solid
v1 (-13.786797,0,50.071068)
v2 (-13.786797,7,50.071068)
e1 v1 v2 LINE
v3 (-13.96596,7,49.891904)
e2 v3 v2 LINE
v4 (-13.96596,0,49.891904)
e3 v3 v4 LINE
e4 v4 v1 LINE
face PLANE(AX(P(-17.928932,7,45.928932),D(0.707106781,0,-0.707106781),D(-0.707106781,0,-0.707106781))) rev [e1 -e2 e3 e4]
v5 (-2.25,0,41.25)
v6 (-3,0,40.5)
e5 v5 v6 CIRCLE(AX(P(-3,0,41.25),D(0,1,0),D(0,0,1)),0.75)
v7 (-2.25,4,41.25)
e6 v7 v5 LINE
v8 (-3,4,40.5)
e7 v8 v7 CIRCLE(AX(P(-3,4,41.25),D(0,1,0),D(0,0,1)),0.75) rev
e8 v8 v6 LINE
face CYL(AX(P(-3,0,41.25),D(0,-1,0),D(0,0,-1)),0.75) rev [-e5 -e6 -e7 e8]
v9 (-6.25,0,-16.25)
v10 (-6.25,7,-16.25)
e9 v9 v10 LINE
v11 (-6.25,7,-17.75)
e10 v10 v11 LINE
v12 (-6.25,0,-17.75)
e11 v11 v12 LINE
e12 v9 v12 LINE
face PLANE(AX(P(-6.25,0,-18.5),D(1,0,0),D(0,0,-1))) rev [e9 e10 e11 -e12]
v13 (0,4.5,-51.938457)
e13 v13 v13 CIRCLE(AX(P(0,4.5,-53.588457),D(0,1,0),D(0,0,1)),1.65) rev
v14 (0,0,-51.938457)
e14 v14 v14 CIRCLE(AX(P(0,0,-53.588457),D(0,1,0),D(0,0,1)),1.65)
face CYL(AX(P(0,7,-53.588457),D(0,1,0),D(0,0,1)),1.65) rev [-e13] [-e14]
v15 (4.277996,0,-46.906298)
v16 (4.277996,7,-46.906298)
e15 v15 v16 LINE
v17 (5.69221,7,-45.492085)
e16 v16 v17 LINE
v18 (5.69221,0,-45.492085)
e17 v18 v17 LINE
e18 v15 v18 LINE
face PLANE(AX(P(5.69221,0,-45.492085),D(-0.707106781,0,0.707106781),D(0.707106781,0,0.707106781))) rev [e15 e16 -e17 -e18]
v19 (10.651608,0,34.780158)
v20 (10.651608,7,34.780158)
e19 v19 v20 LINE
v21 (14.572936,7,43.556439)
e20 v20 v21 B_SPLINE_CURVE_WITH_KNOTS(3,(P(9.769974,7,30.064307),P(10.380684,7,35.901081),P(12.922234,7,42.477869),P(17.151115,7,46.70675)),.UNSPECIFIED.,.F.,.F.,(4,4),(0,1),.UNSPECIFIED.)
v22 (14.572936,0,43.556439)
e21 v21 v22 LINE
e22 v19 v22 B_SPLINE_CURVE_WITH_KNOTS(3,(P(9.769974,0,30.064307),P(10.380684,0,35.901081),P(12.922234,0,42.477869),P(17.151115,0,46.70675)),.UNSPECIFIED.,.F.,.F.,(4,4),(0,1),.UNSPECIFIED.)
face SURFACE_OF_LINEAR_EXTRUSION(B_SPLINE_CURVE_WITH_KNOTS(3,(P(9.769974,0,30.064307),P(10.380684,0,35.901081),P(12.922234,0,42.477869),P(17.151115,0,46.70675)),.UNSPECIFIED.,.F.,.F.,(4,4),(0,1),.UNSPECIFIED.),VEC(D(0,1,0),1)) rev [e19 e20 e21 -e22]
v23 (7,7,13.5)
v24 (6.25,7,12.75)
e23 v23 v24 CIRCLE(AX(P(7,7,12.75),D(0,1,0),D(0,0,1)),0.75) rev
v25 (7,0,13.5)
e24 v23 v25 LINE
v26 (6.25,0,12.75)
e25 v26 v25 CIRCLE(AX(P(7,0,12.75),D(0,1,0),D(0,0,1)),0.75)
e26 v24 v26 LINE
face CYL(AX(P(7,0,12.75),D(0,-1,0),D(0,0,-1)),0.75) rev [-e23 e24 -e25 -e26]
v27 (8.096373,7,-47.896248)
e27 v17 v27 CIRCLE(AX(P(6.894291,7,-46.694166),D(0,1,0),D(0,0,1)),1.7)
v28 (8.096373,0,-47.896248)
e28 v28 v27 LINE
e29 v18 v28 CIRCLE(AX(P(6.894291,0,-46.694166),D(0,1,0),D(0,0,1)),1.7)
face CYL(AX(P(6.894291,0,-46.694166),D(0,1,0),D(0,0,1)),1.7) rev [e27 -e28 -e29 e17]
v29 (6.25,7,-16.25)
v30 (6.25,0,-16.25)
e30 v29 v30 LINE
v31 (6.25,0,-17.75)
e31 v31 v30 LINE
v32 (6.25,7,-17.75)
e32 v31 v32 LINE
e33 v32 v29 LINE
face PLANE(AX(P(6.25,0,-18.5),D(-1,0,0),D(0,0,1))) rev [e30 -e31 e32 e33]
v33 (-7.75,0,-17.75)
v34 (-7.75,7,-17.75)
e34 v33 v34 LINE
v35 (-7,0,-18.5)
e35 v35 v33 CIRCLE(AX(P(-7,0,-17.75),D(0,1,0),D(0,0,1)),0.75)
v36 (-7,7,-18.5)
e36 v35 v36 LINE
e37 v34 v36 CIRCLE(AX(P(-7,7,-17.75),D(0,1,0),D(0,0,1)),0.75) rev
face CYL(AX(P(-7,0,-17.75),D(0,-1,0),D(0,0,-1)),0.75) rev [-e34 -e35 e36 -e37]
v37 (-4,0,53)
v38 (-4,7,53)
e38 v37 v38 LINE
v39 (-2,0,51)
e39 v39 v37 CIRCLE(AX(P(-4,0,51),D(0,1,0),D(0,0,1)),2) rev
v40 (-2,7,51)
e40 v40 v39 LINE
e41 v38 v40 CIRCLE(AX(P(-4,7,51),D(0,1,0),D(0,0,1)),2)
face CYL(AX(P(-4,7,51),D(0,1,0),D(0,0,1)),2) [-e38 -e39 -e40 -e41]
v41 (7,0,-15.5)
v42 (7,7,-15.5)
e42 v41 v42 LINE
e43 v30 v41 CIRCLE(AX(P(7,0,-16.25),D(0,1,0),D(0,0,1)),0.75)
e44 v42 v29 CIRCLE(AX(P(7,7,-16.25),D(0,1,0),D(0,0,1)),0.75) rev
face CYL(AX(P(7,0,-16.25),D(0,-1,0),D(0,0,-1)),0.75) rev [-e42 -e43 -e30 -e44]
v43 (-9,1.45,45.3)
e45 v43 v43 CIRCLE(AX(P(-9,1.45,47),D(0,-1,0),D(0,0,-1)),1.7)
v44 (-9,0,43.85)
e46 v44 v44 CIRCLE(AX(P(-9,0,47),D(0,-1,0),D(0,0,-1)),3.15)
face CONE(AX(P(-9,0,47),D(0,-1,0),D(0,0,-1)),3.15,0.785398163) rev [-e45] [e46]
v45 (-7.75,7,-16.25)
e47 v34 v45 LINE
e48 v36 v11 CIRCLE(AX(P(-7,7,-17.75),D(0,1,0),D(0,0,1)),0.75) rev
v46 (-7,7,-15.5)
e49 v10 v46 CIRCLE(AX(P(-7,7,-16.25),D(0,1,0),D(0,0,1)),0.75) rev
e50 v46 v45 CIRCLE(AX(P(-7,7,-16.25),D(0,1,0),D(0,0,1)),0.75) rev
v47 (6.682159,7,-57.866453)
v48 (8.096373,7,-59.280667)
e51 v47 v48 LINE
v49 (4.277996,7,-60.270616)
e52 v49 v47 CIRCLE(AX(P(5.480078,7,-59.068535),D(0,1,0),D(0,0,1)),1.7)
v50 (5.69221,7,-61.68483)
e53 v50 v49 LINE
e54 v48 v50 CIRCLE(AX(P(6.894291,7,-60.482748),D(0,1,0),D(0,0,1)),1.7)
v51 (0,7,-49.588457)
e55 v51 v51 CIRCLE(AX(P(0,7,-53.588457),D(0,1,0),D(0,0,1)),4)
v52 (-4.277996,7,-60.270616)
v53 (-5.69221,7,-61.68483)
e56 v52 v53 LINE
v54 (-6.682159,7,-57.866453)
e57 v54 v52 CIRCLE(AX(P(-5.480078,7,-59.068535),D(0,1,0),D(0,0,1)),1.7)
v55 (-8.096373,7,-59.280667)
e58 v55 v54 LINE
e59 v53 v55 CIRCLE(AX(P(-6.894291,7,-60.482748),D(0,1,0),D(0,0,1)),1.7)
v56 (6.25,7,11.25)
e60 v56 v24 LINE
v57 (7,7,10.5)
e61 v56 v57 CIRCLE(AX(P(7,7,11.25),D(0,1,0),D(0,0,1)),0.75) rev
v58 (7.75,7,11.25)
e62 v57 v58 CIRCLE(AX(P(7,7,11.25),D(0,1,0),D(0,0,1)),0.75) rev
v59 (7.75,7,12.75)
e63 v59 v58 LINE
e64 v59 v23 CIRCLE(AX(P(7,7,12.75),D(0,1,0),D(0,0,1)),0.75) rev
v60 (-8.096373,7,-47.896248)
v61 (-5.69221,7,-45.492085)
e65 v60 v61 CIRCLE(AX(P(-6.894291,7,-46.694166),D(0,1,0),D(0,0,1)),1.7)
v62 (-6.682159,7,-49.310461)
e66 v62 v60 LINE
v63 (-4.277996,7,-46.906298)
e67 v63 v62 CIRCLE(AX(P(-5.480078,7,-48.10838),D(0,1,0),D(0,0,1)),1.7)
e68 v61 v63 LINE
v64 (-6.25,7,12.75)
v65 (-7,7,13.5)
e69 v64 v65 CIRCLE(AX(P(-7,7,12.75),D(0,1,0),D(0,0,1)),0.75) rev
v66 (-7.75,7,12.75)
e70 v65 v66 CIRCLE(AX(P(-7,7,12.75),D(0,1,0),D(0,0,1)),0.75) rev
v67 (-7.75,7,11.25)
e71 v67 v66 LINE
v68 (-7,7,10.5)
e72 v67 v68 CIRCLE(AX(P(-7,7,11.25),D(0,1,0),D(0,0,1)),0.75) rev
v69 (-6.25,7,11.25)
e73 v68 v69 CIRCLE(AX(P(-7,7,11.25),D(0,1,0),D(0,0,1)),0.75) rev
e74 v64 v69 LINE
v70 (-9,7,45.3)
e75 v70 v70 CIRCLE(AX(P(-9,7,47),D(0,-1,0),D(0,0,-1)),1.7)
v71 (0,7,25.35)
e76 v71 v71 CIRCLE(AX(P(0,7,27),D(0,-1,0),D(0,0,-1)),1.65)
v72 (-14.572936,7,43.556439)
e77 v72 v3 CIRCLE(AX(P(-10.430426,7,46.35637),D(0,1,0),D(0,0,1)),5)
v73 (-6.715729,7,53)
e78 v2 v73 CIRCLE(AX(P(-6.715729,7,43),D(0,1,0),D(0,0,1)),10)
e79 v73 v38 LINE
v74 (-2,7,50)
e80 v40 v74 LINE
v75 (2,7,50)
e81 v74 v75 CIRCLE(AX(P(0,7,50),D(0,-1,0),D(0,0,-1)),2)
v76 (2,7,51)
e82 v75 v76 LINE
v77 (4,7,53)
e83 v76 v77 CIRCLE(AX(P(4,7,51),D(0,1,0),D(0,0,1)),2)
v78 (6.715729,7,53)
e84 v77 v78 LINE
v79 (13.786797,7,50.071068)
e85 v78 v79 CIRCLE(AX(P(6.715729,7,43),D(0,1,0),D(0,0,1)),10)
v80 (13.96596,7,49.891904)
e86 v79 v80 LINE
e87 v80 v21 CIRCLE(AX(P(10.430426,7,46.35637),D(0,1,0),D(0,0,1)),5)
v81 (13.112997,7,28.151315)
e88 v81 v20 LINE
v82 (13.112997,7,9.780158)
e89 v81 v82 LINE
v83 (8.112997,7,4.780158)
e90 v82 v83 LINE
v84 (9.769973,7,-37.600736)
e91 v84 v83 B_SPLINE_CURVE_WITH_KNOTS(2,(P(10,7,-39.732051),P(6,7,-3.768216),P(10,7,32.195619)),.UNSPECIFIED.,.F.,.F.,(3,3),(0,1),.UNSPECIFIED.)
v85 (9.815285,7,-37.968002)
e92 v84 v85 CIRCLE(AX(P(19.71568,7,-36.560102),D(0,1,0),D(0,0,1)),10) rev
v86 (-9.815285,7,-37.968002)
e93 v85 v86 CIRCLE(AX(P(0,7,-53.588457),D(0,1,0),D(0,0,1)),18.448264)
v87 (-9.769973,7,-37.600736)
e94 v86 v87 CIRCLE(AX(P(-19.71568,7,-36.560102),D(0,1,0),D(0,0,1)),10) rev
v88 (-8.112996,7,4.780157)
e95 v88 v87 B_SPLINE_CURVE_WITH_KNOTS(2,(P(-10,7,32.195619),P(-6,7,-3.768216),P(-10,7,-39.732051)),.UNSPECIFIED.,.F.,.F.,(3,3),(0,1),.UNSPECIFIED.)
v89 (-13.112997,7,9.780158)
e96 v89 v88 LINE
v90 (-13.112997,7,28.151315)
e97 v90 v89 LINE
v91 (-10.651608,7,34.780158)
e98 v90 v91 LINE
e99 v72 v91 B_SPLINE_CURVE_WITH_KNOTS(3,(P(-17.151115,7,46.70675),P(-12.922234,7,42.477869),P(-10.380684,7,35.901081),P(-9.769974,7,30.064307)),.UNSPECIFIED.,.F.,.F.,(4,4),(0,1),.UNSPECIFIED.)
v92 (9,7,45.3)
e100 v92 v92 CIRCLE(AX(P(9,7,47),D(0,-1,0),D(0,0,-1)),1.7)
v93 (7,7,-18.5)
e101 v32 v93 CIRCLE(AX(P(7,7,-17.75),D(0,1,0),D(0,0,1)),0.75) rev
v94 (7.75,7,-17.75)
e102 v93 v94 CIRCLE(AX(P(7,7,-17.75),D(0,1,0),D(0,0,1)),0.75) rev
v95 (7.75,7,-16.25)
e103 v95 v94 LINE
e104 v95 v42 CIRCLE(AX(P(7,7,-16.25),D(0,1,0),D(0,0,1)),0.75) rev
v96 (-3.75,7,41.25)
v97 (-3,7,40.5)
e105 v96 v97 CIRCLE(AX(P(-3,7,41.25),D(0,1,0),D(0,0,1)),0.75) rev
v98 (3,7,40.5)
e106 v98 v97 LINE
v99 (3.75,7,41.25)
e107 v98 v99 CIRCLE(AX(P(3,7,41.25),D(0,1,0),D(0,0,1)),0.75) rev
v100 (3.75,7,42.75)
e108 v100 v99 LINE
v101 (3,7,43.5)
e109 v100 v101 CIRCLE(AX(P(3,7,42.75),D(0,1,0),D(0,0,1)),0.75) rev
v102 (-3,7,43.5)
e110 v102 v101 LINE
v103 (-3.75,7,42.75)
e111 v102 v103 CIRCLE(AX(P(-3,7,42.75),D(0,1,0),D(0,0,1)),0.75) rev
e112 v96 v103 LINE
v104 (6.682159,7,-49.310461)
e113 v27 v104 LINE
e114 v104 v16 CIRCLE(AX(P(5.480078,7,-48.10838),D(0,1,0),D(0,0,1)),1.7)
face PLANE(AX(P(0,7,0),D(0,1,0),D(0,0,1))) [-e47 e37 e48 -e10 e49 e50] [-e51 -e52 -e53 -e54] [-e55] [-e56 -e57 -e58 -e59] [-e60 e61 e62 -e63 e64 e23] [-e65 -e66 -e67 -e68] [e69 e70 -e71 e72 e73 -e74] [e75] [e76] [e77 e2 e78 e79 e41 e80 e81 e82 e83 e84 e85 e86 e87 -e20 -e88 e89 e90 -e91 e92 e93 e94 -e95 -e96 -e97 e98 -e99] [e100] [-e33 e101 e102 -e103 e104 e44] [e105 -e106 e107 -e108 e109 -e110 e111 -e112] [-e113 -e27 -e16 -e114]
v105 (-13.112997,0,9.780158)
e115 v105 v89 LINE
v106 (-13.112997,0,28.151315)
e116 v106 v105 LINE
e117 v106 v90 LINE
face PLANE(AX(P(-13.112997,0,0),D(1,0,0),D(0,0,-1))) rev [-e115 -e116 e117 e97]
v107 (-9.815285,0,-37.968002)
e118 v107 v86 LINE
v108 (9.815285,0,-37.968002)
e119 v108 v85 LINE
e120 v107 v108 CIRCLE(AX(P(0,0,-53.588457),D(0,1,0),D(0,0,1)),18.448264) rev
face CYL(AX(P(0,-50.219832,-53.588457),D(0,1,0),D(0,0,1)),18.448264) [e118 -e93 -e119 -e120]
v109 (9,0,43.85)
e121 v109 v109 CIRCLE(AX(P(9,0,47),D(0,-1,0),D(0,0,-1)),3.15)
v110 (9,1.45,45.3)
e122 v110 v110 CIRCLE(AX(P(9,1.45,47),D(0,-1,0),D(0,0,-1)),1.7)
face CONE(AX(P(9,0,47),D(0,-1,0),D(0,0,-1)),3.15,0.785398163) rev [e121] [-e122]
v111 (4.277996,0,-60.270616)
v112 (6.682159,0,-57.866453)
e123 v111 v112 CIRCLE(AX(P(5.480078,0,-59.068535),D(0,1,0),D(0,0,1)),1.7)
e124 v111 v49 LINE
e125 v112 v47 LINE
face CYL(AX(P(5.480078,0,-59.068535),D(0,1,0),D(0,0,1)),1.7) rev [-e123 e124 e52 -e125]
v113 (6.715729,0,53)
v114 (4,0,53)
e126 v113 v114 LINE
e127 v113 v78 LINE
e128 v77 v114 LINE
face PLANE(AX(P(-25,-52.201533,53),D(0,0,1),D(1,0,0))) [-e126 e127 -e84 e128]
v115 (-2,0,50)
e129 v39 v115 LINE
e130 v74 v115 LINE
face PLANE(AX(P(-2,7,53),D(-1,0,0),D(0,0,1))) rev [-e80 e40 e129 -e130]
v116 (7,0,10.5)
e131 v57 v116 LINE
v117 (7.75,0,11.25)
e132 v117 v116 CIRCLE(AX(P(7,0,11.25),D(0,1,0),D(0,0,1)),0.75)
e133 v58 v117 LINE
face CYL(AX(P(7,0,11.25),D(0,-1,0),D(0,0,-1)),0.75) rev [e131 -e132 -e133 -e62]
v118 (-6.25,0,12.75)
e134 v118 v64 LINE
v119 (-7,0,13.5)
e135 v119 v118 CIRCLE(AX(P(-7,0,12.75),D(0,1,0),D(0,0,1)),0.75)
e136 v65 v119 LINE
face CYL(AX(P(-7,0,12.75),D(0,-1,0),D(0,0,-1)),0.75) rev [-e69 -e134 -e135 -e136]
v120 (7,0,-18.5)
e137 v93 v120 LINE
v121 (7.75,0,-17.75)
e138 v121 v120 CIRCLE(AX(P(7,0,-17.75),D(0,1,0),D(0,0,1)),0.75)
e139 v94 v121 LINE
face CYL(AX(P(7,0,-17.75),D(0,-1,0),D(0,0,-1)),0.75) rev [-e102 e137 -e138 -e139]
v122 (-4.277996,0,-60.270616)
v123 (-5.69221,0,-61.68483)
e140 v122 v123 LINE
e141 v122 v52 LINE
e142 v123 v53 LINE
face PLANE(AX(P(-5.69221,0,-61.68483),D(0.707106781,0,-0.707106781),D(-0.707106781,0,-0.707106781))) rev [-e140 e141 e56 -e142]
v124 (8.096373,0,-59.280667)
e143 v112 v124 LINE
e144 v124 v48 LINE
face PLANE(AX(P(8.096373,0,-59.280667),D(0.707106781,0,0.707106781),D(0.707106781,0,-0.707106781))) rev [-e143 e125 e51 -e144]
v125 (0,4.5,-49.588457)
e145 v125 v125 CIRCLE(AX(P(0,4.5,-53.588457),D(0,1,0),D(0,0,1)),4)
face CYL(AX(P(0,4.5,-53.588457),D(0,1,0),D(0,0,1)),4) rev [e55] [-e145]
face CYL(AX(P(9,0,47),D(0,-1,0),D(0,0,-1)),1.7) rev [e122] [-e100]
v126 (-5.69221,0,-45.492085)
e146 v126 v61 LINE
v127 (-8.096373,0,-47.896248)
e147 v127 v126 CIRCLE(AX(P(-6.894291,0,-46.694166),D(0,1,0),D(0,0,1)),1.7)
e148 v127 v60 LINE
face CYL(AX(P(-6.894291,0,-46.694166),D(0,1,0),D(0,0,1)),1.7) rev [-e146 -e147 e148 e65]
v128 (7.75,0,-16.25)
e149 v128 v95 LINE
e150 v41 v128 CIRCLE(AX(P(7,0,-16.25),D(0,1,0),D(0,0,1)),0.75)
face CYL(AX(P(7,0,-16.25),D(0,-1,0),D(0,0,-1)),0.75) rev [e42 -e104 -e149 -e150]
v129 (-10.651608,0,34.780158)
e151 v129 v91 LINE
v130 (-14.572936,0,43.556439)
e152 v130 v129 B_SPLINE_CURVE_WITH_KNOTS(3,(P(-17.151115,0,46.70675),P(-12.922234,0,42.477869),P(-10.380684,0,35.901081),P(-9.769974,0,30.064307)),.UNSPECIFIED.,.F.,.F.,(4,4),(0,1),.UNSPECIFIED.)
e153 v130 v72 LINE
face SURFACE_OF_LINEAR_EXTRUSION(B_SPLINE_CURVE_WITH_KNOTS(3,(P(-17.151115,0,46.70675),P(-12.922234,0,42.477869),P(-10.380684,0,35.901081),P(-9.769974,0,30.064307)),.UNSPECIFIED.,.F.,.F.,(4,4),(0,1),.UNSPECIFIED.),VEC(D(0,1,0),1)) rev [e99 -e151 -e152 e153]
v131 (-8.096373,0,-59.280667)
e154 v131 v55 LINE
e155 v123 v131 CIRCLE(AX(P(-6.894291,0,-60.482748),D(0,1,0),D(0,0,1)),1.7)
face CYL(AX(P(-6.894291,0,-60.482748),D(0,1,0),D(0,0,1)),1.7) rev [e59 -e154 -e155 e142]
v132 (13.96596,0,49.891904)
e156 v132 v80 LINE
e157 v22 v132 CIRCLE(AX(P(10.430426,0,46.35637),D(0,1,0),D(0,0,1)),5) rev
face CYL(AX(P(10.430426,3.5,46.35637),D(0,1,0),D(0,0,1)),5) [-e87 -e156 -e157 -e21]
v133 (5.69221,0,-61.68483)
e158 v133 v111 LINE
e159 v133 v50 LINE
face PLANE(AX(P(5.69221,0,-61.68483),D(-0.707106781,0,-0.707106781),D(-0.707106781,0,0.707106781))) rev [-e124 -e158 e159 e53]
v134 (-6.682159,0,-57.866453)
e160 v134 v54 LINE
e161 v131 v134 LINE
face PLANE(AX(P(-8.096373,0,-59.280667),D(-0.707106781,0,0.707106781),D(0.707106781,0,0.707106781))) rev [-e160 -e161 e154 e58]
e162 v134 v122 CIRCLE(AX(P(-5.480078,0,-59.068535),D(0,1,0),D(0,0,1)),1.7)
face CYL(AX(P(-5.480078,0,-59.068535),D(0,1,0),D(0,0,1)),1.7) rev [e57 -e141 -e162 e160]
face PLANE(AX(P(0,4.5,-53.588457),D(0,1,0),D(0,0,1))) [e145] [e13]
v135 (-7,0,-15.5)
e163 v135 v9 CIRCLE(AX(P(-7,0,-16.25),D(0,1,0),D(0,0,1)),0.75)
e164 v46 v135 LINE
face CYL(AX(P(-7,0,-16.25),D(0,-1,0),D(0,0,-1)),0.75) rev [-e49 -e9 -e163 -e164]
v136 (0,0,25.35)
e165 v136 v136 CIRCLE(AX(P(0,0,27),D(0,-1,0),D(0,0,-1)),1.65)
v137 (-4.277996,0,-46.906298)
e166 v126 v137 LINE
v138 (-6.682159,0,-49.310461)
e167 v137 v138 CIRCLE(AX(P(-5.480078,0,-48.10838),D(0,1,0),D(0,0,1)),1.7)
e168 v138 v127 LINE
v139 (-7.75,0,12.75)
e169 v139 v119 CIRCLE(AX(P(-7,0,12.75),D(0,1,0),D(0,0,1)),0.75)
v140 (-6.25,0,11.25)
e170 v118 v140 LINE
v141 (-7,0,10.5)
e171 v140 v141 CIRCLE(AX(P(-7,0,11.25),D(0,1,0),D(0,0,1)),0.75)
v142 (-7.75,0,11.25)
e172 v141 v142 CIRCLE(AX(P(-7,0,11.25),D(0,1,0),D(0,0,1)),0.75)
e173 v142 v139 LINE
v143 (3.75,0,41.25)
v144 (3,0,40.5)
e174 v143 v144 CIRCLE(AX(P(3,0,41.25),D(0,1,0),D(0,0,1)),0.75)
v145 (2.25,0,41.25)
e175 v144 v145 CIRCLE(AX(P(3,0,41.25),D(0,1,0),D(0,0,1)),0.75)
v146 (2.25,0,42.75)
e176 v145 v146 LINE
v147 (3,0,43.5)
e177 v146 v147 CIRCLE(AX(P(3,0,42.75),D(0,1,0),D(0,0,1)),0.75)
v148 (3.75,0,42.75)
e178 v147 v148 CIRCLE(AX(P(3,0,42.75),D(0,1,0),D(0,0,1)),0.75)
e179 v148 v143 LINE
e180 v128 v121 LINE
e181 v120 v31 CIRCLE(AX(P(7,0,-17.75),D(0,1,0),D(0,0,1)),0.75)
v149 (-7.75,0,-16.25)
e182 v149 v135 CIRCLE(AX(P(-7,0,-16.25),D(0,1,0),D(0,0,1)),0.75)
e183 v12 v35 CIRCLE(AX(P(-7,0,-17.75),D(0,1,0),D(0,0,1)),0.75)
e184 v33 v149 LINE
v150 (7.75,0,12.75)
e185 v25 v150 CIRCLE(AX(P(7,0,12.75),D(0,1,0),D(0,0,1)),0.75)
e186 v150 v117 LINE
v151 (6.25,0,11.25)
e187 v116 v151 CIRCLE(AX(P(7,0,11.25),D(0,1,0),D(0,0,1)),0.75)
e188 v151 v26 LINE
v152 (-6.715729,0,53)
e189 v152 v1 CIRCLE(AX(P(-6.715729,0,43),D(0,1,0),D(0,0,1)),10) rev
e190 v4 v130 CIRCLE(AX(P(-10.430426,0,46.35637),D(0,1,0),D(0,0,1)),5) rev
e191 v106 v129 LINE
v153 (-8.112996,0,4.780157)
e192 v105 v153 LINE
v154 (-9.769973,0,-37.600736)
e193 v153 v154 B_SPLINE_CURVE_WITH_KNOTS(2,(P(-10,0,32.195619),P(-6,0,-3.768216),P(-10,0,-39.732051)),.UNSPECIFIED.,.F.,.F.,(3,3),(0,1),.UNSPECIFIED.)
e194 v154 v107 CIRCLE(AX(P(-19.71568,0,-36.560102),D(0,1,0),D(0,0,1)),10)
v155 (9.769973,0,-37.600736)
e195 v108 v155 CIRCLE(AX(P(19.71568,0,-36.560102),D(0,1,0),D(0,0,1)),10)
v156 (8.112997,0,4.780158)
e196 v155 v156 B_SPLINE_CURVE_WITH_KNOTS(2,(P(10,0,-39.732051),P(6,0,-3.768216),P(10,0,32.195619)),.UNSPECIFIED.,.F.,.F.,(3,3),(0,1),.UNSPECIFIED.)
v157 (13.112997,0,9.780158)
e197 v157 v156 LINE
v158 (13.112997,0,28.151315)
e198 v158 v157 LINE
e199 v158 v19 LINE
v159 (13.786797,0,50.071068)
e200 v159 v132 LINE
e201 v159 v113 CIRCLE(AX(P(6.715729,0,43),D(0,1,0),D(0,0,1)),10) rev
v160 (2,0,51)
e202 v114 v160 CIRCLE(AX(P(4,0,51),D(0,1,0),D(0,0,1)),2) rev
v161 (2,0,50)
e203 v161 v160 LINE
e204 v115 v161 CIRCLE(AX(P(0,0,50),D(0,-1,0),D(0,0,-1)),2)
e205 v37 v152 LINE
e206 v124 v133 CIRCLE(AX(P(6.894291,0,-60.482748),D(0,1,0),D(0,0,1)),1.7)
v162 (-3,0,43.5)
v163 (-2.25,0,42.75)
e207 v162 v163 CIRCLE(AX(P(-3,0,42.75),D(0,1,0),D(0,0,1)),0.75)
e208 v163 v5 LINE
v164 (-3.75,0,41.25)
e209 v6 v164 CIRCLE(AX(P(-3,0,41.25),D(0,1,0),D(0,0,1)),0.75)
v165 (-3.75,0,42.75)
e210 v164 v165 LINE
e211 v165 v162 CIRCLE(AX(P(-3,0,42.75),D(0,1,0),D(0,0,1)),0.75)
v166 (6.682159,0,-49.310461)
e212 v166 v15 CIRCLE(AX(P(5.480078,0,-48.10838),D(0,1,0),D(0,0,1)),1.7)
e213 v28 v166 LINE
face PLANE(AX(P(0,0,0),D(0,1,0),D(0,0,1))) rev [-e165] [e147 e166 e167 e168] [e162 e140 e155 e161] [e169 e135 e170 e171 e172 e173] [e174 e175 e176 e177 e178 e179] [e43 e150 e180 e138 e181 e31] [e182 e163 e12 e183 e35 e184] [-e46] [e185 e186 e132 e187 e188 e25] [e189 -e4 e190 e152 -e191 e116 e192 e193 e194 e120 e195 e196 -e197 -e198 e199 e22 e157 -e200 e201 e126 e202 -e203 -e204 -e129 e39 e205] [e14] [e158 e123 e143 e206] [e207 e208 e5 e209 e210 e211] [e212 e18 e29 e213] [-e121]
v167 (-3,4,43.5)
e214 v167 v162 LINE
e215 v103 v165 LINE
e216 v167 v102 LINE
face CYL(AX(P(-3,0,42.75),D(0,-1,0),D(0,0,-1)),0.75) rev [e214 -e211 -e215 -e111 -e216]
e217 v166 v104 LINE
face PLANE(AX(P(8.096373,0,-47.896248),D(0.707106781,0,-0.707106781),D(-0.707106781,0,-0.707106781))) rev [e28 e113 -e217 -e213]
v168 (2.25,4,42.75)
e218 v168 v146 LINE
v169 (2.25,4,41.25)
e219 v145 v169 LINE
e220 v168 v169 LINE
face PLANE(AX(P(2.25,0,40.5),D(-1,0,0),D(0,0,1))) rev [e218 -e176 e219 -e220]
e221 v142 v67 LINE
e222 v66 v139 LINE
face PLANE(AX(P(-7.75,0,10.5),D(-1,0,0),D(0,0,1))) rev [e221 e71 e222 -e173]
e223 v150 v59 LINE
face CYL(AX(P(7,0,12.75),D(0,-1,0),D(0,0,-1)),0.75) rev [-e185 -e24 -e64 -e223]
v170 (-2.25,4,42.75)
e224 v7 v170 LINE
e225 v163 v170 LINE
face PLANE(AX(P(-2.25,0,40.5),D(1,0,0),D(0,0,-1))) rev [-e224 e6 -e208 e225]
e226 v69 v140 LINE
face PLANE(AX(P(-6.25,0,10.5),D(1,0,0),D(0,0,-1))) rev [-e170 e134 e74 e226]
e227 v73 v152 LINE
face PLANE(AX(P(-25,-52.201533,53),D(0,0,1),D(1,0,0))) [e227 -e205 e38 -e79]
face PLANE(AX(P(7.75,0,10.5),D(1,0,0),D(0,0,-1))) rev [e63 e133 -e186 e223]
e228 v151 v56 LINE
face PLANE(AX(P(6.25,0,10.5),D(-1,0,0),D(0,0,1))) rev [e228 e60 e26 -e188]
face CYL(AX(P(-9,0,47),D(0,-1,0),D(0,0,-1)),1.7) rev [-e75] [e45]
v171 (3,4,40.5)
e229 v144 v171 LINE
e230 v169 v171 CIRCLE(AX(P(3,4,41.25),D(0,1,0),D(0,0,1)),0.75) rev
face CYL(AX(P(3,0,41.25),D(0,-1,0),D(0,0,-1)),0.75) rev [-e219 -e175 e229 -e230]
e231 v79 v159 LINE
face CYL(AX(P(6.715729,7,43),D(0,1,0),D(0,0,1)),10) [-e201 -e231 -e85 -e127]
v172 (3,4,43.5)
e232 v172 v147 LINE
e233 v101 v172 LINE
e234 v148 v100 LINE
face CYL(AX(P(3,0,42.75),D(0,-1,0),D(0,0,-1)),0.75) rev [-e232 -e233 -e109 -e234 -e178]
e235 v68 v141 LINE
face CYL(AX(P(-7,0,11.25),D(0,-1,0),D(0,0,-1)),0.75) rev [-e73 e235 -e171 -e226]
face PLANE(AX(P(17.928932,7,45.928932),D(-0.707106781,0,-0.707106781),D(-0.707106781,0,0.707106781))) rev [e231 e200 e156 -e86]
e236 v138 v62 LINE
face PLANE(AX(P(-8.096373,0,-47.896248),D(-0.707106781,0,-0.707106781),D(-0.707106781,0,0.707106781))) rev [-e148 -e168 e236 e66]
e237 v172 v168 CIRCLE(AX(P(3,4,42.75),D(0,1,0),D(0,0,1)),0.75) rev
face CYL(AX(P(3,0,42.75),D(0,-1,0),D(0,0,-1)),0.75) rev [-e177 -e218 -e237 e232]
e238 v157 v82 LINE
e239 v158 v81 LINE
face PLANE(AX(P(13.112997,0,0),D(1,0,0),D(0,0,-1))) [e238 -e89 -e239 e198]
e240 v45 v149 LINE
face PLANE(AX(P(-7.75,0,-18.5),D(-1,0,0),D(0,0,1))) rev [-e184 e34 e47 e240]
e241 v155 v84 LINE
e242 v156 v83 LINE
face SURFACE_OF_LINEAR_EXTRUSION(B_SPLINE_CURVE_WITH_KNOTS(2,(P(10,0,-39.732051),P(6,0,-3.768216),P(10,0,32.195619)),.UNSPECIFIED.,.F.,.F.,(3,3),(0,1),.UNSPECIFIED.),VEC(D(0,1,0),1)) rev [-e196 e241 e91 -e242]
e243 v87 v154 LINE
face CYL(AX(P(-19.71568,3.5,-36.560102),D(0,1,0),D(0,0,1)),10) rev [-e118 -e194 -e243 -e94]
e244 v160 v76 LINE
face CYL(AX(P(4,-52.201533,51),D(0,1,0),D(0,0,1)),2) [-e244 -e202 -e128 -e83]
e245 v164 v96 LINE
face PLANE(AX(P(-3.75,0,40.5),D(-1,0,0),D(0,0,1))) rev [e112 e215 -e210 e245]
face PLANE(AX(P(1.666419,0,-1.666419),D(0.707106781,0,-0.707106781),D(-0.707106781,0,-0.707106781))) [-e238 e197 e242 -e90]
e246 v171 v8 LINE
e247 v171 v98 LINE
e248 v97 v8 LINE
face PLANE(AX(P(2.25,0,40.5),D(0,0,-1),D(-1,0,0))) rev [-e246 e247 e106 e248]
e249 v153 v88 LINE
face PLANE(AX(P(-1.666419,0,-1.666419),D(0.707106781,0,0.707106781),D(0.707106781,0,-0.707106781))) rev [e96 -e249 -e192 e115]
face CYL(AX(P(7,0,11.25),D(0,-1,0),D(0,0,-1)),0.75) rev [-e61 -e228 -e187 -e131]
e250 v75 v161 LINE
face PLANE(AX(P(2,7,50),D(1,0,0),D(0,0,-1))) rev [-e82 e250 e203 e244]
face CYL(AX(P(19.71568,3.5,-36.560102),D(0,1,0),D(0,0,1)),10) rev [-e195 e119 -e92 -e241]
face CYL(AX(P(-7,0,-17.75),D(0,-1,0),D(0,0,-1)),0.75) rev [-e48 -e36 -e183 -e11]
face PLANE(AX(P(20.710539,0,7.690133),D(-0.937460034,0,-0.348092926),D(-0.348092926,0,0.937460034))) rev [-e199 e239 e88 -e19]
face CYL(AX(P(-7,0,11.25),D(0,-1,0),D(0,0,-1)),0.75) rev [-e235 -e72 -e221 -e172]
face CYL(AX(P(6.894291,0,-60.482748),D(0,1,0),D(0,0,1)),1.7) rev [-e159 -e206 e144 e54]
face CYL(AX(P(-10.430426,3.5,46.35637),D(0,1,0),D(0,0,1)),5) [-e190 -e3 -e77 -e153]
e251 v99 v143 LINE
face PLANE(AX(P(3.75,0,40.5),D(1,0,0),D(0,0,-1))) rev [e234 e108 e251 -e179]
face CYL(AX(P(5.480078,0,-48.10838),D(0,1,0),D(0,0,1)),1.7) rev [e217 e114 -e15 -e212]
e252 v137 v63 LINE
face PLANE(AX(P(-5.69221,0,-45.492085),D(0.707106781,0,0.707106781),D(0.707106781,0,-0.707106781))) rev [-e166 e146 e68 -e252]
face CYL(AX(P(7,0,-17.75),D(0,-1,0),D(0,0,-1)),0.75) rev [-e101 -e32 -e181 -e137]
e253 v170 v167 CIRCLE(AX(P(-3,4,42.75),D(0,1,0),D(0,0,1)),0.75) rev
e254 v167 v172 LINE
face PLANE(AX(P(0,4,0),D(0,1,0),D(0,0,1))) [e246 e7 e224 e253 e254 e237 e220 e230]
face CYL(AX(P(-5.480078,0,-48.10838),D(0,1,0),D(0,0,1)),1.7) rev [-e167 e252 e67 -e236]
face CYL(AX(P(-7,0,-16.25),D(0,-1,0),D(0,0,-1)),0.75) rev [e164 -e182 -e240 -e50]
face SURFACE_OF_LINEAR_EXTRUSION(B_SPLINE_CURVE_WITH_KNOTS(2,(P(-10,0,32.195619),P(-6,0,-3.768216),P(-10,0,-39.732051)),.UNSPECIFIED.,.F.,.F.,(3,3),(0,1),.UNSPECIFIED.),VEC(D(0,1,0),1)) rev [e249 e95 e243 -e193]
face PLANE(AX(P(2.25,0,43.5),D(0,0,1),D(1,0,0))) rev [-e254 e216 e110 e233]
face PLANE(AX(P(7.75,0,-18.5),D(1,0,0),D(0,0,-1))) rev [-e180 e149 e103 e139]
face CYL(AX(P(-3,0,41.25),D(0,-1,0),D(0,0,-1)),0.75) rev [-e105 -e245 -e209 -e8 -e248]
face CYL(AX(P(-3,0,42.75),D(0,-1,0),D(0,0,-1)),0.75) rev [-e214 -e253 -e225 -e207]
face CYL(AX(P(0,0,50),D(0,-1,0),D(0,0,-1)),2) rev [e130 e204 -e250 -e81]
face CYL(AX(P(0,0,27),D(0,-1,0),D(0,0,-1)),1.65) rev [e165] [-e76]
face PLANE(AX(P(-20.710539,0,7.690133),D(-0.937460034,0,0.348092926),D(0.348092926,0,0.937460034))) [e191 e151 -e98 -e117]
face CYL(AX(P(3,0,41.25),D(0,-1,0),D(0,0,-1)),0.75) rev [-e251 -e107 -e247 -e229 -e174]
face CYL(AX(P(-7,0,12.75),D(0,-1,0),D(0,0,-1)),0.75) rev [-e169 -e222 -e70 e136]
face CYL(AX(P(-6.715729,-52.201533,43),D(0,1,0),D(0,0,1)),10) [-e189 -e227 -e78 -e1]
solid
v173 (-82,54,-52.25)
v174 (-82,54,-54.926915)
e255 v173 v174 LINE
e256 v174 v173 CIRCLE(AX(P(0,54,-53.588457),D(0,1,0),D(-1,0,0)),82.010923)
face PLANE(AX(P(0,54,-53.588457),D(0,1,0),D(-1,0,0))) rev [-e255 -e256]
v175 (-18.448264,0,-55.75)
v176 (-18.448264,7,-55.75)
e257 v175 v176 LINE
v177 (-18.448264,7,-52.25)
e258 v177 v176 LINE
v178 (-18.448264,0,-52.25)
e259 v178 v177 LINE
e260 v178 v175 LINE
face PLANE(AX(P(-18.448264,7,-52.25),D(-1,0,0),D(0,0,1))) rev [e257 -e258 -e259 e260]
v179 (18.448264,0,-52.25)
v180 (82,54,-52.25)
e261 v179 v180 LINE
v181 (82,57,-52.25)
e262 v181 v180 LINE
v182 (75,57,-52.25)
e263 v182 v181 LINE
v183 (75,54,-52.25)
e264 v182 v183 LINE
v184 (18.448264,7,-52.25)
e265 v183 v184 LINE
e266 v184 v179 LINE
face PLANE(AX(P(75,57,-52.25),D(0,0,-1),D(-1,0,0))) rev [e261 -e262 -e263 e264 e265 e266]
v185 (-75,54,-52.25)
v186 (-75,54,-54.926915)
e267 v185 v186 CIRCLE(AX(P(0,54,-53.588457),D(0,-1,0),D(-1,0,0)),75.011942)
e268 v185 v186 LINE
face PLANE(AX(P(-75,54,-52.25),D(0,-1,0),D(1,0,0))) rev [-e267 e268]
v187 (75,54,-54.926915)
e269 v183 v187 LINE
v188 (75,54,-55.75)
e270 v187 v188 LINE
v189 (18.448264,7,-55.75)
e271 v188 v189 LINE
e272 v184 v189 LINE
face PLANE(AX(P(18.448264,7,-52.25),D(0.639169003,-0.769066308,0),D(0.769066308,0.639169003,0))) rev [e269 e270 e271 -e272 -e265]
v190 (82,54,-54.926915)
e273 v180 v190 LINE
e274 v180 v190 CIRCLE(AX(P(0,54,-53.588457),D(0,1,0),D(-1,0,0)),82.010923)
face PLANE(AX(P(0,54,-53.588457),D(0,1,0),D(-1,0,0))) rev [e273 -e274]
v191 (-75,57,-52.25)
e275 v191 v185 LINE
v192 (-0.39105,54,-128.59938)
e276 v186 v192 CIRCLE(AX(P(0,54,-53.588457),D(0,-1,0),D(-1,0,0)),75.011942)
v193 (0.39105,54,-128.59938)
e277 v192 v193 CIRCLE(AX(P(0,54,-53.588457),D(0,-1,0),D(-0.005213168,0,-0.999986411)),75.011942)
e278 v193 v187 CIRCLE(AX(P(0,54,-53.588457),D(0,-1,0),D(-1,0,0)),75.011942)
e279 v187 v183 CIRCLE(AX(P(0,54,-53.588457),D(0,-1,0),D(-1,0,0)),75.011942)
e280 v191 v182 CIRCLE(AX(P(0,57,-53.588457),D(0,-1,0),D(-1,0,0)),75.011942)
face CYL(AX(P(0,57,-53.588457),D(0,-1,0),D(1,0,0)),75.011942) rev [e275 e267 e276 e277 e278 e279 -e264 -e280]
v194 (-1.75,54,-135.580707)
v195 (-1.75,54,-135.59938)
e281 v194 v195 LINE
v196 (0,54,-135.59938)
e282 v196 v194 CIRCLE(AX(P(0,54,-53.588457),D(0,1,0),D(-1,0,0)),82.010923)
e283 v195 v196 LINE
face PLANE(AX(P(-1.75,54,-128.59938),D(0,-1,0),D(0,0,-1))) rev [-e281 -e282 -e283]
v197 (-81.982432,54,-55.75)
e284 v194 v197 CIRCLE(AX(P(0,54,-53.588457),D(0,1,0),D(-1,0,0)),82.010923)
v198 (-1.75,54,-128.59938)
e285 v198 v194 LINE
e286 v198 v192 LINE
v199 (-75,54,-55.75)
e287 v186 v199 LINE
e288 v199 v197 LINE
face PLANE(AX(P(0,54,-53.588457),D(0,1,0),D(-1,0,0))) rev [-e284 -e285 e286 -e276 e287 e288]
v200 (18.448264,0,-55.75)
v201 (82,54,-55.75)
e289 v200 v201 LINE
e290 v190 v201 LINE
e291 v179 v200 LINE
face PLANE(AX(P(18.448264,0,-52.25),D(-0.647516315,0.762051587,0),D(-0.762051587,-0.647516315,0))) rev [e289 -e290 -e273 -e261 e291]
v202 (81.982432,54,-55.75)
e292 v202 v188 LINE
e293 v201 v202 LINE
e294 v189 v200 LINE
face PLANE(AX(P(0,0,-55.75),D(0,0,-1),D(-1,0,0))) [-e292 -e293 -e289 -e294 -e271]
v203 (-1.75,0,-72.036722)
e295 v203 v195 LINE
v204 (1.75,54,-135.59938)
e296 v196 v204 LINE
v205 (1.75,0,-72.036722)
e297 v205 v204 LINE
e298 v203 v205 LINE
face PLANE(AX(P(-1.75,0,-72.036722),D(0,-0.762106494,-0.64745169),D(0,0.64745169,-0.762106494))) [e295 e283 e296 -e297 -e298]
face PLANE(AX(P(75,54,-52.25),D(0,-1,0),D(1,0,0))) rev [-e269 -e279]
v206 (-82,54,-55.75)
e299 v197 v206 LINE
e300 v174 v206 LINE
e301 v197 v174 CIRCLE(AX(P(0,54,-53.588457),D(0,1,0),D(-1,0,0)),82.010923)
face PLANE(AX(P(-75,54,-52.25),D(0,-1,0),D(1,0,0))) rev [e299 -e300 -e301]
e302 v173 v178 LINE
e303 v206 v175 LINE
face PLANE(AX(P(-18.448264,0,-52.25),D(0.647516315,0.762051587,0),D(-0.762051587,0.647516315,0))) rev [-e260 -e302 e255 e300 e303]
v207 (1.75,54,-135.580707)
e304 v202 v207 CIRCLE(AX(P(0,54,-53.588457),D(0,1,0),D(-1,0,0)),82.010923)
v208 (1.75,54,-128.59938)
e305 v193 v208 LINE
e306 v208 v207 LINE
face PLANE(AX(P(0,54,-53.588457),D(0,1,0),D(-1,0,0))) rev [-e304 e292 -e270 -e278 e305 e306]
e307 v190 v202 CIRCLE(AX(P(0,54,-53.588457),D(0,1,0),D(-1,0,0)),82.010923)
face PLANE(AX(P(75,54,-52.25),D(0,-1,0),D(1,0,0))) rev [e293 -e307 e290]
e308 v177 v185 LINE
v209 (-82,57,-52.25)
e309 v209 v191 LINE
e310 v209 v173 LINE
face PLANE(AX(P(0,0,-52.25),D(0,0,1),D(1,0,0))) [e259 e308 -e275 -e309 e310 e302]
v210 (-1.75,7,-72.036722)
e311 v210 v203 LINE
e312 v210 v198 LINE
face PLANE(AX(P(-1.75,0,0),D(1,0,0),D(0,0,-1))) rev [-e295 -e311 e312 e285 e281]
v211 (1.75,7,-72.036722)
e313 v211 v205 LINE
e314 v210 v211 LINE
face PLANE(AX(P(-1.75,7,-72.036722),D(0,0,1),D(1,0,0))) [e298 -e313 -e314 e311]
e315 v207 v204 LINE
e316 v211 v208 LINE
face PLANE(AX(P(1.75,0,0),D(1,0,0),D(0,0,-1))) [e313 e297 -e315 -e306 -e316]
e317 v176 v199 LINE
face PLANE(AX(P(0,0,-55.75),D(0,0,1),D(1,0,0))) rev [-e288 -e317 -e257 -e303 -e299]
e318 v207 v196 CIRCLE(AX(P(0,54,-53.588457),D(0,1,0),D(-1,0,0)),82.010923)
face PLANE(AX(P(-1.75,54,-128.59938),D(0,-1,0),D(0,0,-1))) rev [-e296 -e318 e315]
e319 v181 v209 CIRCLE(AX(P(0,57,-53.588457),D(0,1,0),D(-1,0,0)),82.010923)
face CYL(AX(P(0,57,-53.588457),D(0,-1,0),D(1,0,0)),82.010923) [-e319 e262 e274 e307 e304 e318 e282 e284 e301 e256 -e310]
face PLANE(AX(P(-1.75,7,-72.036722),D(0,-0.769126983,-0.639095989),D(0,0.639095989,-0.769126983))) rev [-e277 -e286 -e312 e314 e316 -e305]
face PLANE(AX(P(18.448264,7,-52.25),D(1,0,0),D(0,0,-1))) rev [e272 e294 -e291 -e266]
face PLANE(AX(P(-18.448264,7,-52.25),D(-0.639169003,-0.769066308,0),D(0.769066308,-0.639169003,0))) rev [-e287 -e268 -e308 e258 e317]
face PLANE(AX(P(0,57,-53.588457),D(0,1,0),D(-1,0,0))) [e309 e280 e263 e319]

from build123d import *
from OCP.BRepFilletAPI import BRepFilletAPI_MakeChamfer

# Parameters (mm, degrees)
SKETCH1_W                                       = 20
SKETCH1_H                                       = 76
BOSS_EXTRUDE1_DEPTH                             = 7
BOSS_EXTRUDE2_DEPTH                             = 7
CUT_EXTRUDE1_DEPTH                              = 72.822318988
BOSS_EXTRUDE3_DEPTH                             = 7
CSK_FOR_M3_FLAT_HEAD_MACHINE_SCREW1_D           = 3.4
CSK_FOR_M3_FLAT_HEAD_MACHINE_SCREW1_CSINK_D     = 6.3
CSK_FOR_M3_FLAT_HEAD_MACHINE_SCREW1_CSINK_ANGLE = 90
CHAMFER3_SIZE                                   = 10
CHAMFER3_SIZE2                                  = 7.071067812
CHAMFER4_SIZE                                   = 3
F_3_3_3_3_DIAMETER_HOLE1_D                      = 3.3
BOSS_EXTRUDE4_DEPTH                             = 7
CUT_EXTRUDE3_DEPTH                              = 72.822318988
F_3_3_3_3_DIAMETER_HOLE2_D                      = 3.3
SKETCH17_W                                      = 1.5
SKETCH17_H                                      = 3
CUT_EXTRUDE5_DEPTH                              = 72.822318988
F_4_0_4_DIAMETER_HOLE1_D                        = 4
CUT_EXTRUDE7_DEPTH                              = 72.822318988
FILLET1_R                                       = 10
FILLET4_R                                       = 10
SKETCH24_R                                      = 4
CUT_EXTRUDE9_DEPTH                              = 2.5
CUT_EXTRUDE11_DEPTH                             = 72.822319119
FILLET6_R                                       = 5
FILLET8_R                                       = 0.75
CUT_EXTRUDE14_DEPTH                             = 72.822319119
FILLET10_R                                      = 2
BOSS_EXTRUDE7_DEPTH                             = 7
SKETCH35_W                                      = 1.5
SKETCH35_H                                      = 3
CUT_EXTRUDE15_DEPTH                             = 72.822319119
SKETCH36_W                                      = 4.5
SKETCH36_H                                      = 3
CUT_EXTRUDE16_DEPTH                             = 3
FILLET11_R                                      = 0.75
SKETCH37_W                                      = 1.5
SKETCH37_H                                      = 3
CUT_EXTRUDE17_DEPTH                             = 72.822319119
FILLET12_R                                      = 0.75
FILLET15_R                                      = 3
BOSS_EXTRUDE8_START                             = -7
BOSS_EXTRUDE8_DEPTH                             = 7
BOSS_EXTRUDE9_DEPTH                             = 1.75
BOSS_EXTRUDE9_2_DEPTH                           = 1.75
BOSS_EXTRUDE11_DEPTH                            = 3
BOSS_EXTRUDE12_DEPTH                            = 1.75


with BuildPart() as part:
    # Sketch1 → Boss-Extrude1 (new body)
    with BuildSketch(Plane(origin=(0, 0, 0), x_dir=(1, 0, 0), z_dir=(0, 1, 0))):
        Rectangle(SKETCH1_W, SKETCH1_H)
    extrude(amount=BOSS_EXTRUDE1_DEPTH)

    # Sketch2 → Boss-Extrude2 (add)
    with BuildSketch(Plane(origin=(0, 7, 0), x_dir=(1, 0, 0), z_dir=(0, 1, 0))):
        Polygon((18, 53.588457268), (9, 69.176914536), (-9, 69.176914536), (-18, 53.588457268), (-10, 39.732050808), (-10, 38), (10, 38), (10, 39.732050808), align=None)
    extrude(amount=-BOSS_EXTRUDE2_DEPTH)

    # Sketch3 → Cut-Extrude1 (cut, through all)
    with BuildSketch(Plane(origin=(0, 7, 0), x_dir=(1, 0, 0), z_dir=(0, 1, 0))):
        with BuildLine():
            Line((-8.096372645, 47.89624768), (-6.682159082, 49.310461242))
            ThreePointArc((-6.682159082, 49.310461242), (-4.277996026, 49.310461242), (-4.277996026, 46.906298186))
            Line((-4.277996026, 46.906298186), (-5.692209589, 45.492084624))
            ThreePointArc((-5.692209589, 45.492084624), (-8.096372645, 45.492084624), (-8.096372645, 47.89624768))
        make_face()
        with BuildLine():
            Line((-5.692209589, 61.684829913), (-4.277996026, 60.27061635))
            ThreePointArc((-4.277996026, 60.27061635), (-4.277996026, 57.866453294), (-6.682159082, 57.866453294))
            Line((-6.682159082, 57.866453294), (-8.096372645, 59.280666857))
            ThreePointArc((-8.096372645, 59.280666857), (-8.096372645, 61.684829913), (-5.692209589, 61.684829913))
        make_face()
        with BuildLine():
            Line((8.096372645, 59.280666857), (6.682159082, 57.866453294))
            ThreePointArc((6.682159082, 57.866453294), (4.277996026, 57.866453294), (4.277996026, 60.27061635))
            Line((4.277996026, 60.27061635), (5.692209589, 61.684829913))
            ThreePointArc((5.692209589, 61.684829913), (8.096372645, 61.684829913), (8.096372645, 59.280666857))
        make_face()
        with BuildLine():
            Line((5.692209589, 45.492084624), (4.277996026, 46.906298186))
            ThreePointArc((4.277996026, 46.906298186), (4.277996026, 49.310461242), (6.682159082, 49.310461242))
            Line((6.682159082, 49.310461242), (8.096372645, 47.89624768))
            ThreePointArc((8.096372645, 47.89624768), (8.096372645, 45.492084624), (5.692209589, 45.492084624))
        make_face()
    extrude(amount=-CUT_EXTRUDE1_DEPTH, mode=Mode.SUBTRACT)

    # Sketch5 → Boss-Extrude3 (add)
    with BuildSketch(Plane(origin=(0, 7, 0), x_dir=(1, 0, 0), z_dir=(0, 1, 0))):
        Polygon((10, -38), (-10, -38), (-25, -53), (25, -53), align=None)
    extrude(amount=-BOSS_EXTRUDE3_DEPTH)

    # CSK for M3 Flat Head Machine Screw1 (through all)
    with Locations(Plane(origin=(0, 0, 0), x_dir=(-1, 0, 0), z_dir=(0, -1, 0))):
        with Locations((9, -47), (-9, -47)):
            CounterSinkHole(CSK_FOR_M3_FLAT_HEAD_MACHINE_SCREW1_D / 2, CSK_FOR_M3_FLAT_HEAD_MACHINE_SCREW1_CSINK_D / 2, counter_sink_angle=CSK_FOR_M3_FLAT_HEAD_MACHINE_SCREW1_CSINK_ANGLE)

    # Chamfer3: one chamfer whose edges measure the first distance from different faces: ONE call of the kernel's chamfer builder (chamfer() names one face for all edges)
    chamfer3_edges_1 = [part.edges().sort_by_distance(p)[0] for p in [
        (-25, 3.5, 53),
    ]]
    chamfer3_side_1 = [part.faces().sort_by_distance(p)[0] for p in [
        (-17.5, 3.5, 45.5),
    ]]
    chamfer3_edges_2 = [part.edges().sort_by_distance(p)[0] for p in [
        (25, 3.5, 53),
    ]]
    chamfer3_side_2 = [part.faces().sort_by_distance(p)[0] for p in [
        (17.5, 3.5, 45.5),
    ]]
    chamfer3 = BRepFilletAPI_MakeChamfer(part.part.solid().wrapped)
    for e in chamfer3_edges_1:
        chamfer3.Add(CHAMFER3_SIZE, CHAMFER3_SIZE2, e.wrapped, chamfer3_side_1[0].wrapped)  # the first distance lies on this face
    for e in chamfer3_edges_2:
        chamfer3.Add(CHAMFER3_SIZE, CHAMFER3_SIZE2, e.wrapped, chamfer3_side_2[0].wrapped)  # the first distance lies on this face
    add(Compound.cast(chamfer3.Shape()), mode=Mode.REPLACE)

    # Chamfer4
    chamfer4_edges = [part.edges().sort_by_distance(p)[0] for p in [
        (17.928932188, 3.5, 53),
        (-17.928932188, 3.5, 53),
    ]]
    chamfer(chamfer4_edges, length=CHAMFER4_SIZE)

    # Ø3.3 (3.3) Diameter Hole1 (through all)
    with Locations(Plane(origin=(0, 0, 0), x_dir=(-1, 0, 0), z_dir=(0, -1, 0))):
        with Locations((0, -27)):
            Hole(F_3_3_3_3_DIAMETER_HOLE1_D / 2)

    # Sketch12 → Boss-Extrude4 (add, through all)
    with BuildSketch(Plane(origin=(0, 7, 0), x_dir=(1, 0, 0), z_dir=(0, 1, 0))):
        Polygon((-17.928932188, -45.928932188), (-10, -32.195618789), (-10, -38), align=None)
        Polygon((10, -38), (17.928932188, -45.928932188), (10, -32.195618789), align=None)
    extrude(amount=-BOSS_EXTRUDE4_DEPTH)

    # Sketch13 → Cut-Extrude3 (cut, through all)
    with BuildSketch(Plane.XZ):
        Polygon((-17.928932188, 45.928932188), (-10.857864376, 53), (-14.928932188, 53), (-17.928932188, 50), align=None)
        Polygon((17.928932188, 50), (17.928932188, 45.928932188), (10.857864376, 53), (14.928932188, 53), align=None)
    extrude(amount=-CUT_EXTRUDE3_DEPTH, mode=Mode.SUBTRACT)

    # Ø3.3 (3.3) Diameter Hole2 (through all)
    with Locations(Plane(origin=(0, 7, 0), x_dir=(1, 0, 0), z_dir=(0, 1, 0))):
        with Locations((0, 53.588457268)):
            Hole(F_3_3_3_3_DIAMETER_HOLE2_D / 2)

    # Sketch17 → Cut-Extrude5 (cut, through all)
    with BuildSketch(Plane(origin=(0, 7, 0), x_dir=(1, 0, 0), z_dir=(0, 1, 0))):
        with Locations((7, 17)):
            Rectangle(SKETCH17_W, SKETCH17_H)
        with Locations((-7, 17)):
            Rectangle(SKETCH17_W, SKETCH17_H)
    extrude(amount=-CUT_EXTRUDE5_DEPTH, mode=Mode.SUBTRACT)

    # Ø4.0 (4) Diameter Hole1 (through all)
    with Locations(Plane(origin=(0, 0, 0), x_dir=(-1, 0, 0), z_dir=(0, -1, 0))):
        with Locations((0, -50)):
            Hole(F_4_0_4_DIAMETER_HOLE1_D / 2)

    # Sketch22 → Cut-Extrude7 (cut, through all)
    with BuildSketch(Plane(origin=(0, 7, 0), x_dir=(1, 0, 0), z_dir=(0, 1, 0))):
        with BuildLine():
            Line((10, 39.732050808), (10, -32.195618789))
            add(Edge.make_bspline(
                [(10, -32.195618789), (6, 3.76821601), (10, 39.732050808)],
                knots=[0, 0, 0, 1, 1, 1], degree=2))
        make_face()
        with BuildLine():
            Line((-10, 39.732050808), (-10, -32.195618789))
            add(Edge.make_bspline(
                [(-10, -32.195618789), (-6, 3.76821601), (-10, 39.732050808)],
                knots=[0, 0, 0, 1, 1, 1], degree=2))
        make_face()
    extrude(amount=-CUT_EXTRUDE7_DEPTH, mode=Mode.SUBTRACT)

    # Fillet1
    fillet1_edges = [part.edges().sort_by_distance(p)[0] for p in [
        (-10, 3.5, -39.732050808),
        (10, 3.5, -39.732050808),
        (-10, 3.5, 32.195618789),
        (10, 3.5, 32.195618789),
    ]]
    fillet(fillet1_edges, radius=FILLET1_R)

    # Fillet4
    fillet4_edges = [part.edges().sort_by_distance(p)[0] for p in [
        (-10.857864376, 3.5, 53),
        (10.857864376, 3.5, 53),
    ]]
    fillet(fillet4_edges, radius=FILLET4_R)

    # Sketch24 → Cut-Extrude9 (cut)
    with BuildSketch(Plane(origin=(0, 7, 0), x_dir=(1, 0, 0), z_dir=(0, 1, 0))):
        with Locations(Location((0, 53.588457268, 0), (0, 0, 270))):
            Circle(SKETCH24_R)
    extrude(amount=-CUT_EXTRUDE9_DEPTH, mode=Mode.SUBTRACT)

    # Sketch26 → Cut-Extrude11 (cut, through all)
    with BuildSketch(Plane(origin=(0, 7, 0), x_dir=(1, 0, 0), z_dir=(0, 1, 0))):
        with BuildLine():
            Line((17.151114729, -46.706749647), (17.928932188, -45.928932188))
            Line((17.928932188, -45.928932188), (9.76997353, -30.064306701))
            add(Edge.make_bspline(
                [(9.76997353, -30.064306701), (10.380683855, -35.901080693), (12.922234489, -42.477869407), (17.151114729, -46.706749647)],
                knots=[0, 0, 0, 0, 1, 1, 1, 1], degree=3))
        make_face()
        with BuildLine():
            Line((-17.928932188, -45.928932188), (-9.76997353, -30.064306701))
            add(Edge.make_bspline(
                [(-9.76997353, -30.064306701), (-10.380683855, -35.901080693), (-12.922234489, -42.477869407), (-17.151114729, -46.706749647)],
                knots=[0, 0, 0, 0, 1, 1, 1, 1], degree=3))
            Line((-17.151114729, -46.706749647), (-17.928932188, -45.928932188))
        make_face()
    extrude(amount=-CUT_EXTRUDE11_DEPTH, mode=Mode.SUBTRACT)

    # Fillet6
    fillet6_edges = [part.edges().sort_by_distance(p)[0] for p in [
        (-17.151114729, 3.5, 46.706749647),
        (17.151114729, 3.5, 46.706749647),
    ]]
    fillet(fillet6_edges, radius=FILLET6_R)

    # Fillet8
    fillet8_edges = [part.edges().sort_by_distance(p)[0] for p in [
        (7.75, 3.5, -18.5),
        (6.25, 3.5, -18.5),
        (7.75, 3.5, -15.5),
        (6.25, 3.5, -15.5),
        (-7.75, 3.5, -18.5),
        (-7.75, 3.5, -15.5),
        (-6.25, 3.5, -15.5),
        (-6.25, 3.5, -18.5),
    ]]
    fillet(fillet8_edges, radius=FILLET8_R - 0.0001)  # a hair under: the kernel refuses the full size

    # Sketch32 → Cut-Extrude14 (cut, through all)
    with BuildSketch(Plane.XZ):
        with BuildLine():
            Line((2, 50), (2, 53))
            Line((2, 53), (-2, 53))
            Line((-2, 53), (-2, 50))
            ThreePointArc((-2, 50), (0, 52), (2, 50))
        make_face()
    extrude(amount=-CUT_EXTRUDE14_DEPTH, mode=Mode.SUBTRACT)

    # Fillet10
    fillet10_edges = [part.edges().sort_by_distance(p)[0] for p in [
        (-2, 3.5, 53),
        (2, 3.5, 53),
    ]]
    fillet(fillet10_edges, radius=FILLET10_R)

    # Sketch33 → Boss-Extrude7 (add, through all)
    with BuildSketch(Plane(origin=(0, 7, 0), x_dir=(1, 0, 0), z_dir=(0, 1, 0))):
        Polygon((-13.112996518, -28.151314757), (-10.651607831, -34.780158226), (-8.670217066, -31.119081351), (-8.112996518, -4.780158226), (-13.112996518, -9.780158226), align=None)
    boss_extrude7 = extrude(amount=-BOSS_EXTRUDE7_DEPTH)

    # Sketch35 → Cut-Extrude15 (cut, through all)
    with BuildSketch(Plane(origin=(0, 7, 0), x_dir=(1, 0, 0), z_dir=(0, 1, 0))):
        with Locations((3, -42)):
            Rectangle(SKETCH35_W, SKETCH35_H)
        with Locations((-3, -42)):
            Rectangle(SKETCH35_W, SKETCH35_H)
    extrude(amount=-CUT_EXTRUDE15_DEPTH, mode=Mode.SUBTRACT)

    # Sketch36 → Cut-Extrude16 (cut)
    with BuildSketch(Plane(origin=(0, 7, 0), x_dir=(1, 0, 0), z_dir=(0, 1, 0))):
        with Locations((0, -42)):
            Rectangle(SKETCH36_W, SKETCH36_H)
    extrude(amount=-CUT_EXTRUDE16_DEPTH, mode=Mode.SUBTRACT)

    # Fillet11
    fillet11_edges = [part.edges().sort_by_distance(p)[0] for p in [
        (-3.75, 3.5, 43.5),
        (-2.25, 2, 40.5),
        (-2.25, 2, 43.5),
        (2.25, 2, 43.5),
        (2.25, 2, 40.5),
        (3.75, 3.5, 40.5),
        (3.75, 3.5, 43.5),
        (-3.75, 3.5, 40.5),
    ]]
    fillet(fillet11_edges, radius=FILLET11_R - 0.0001)  # a hair under: the kernel refuses the full size

    # Mirror6: Boss-Extrude7 across plane
    add(boss_extrude7.mirror(Plane(origin=(0, 0, 0), x_dir=(0, 0, 1), z_dir=(1, 0, 0))))

    # Sketch37 → Cut-Extrude17 (cut, through all)
    with BuildSketch(Plane(origin=(0, 7, 0), x_dir=(1, 0, 0), z_dir=(0, 1, 0))):
        with Locations((7, -12)):
            Rectangle(SKETCH37_W, SKETCH37_H)
        with Locations((-7, -12)):
            Rectangle(SKETCH37_W, SKETCH37_H)
    extrude(amount=-CUT_EXTRUDE17_DEPTH, mode=Mode.SUBTRACT)

    # Fillet12
    fillet12_edges = [part.edges().sort_by_distance(p)[0] for p in [
        (6.25, 3.5, 13.5),
        (7.75, 3.5, 10.5),
        (7.75, 3.5, 13.5),
        (6.25, 3.5, 10.5),
        (-7.75, 3.5, 13.5),
        (-6.25, 3.5, 10.5),
        (-6.25, 3.5, 13.5),
        (-7.75, 3.5, 10.5),
    ]]
    fillet(fillet12_edges, radius=FILLET12_R - 0.0001)  # a hair under: the kernel refuses the full size

    # Fillet15
    fillet15_edges = [part.edges().sort_by_distance(p)[0] for p in [
        (18, 3.5, -53.588457268),
        (-18, 3.5, -53.588457268),
        (-9, 3.5, -69.176914536),
        (9, 3.5, -69.176914536),
    ]]
    fillet(fillet15_edges, radius=FILLET15_R)

    # Sketch42 → Boss-Extrude8 (add)
    with BuildSketch(Plane(origin=(0, 7, 0), x_dir=(1, 0, 0), z_dir=(0, 1, 0)).offset(BOSS_EXTRUDE8_START)):
        with BuildLine():
            Line((-9.866025404, 67.676914536), (-17.133974596, 55.088457268))
            ThreePointArc((-17.133974596, 55.088457268), (-17.535898385, 53.588457268), (-17.133974596, 52.088457268))
            Line((-17.133974596, 52.088457268), (-11.055425867, 41.560102033))
            ThreePointArc((-11.055425867, 41.560102033), (-10.263155445, 39.823502305), (-9.815285014, 37.968001533))
            ThreePointArc((-9.815285014, 37.968001533), (0, 72.036721611), (9.815285014, 37.968001533))
            ThreePointArc((9.815285014, 37.968001533), (10.263155445, 39.823502305), (11.055425867, 41.560102033))
            Line((11.055425867, 41.560102033), (17.133974596, 52.088457268))
            ThreePointArc((17.133974596, 52.088457268), (17.535898385, 53.588457268), (17.133974596, 55.088457268))
            Line((17.133974596, 55.088457268), (9.866025404, 67.676914536))
            ThreePointArc((9.866025404, 67.676914536), (8.767949192, 68.774990748), (7.267949192, 69.176914536))
            Line((7.267949192, 69.176914536), (-7.267949192, 69.176914536))
            ThreePointArc((-7.267949192, 69.176914536), (-8.767949192, 68.774990748), (-9.866025404, 67.676914536))
        make_face()
    extrude(amount=BOSS_EXTRUDE8_DEPTH)


with BuildPart() as body_2:
    # Sketch44 → Boss-Extrude9 (new, symmetric)
    with BuildSketch(Plane.XY.offset(-54)):
        Polygon((-18.448264343, 7), (-18.448264343, 0), (-82, 54), (-75, 54), align=None)
    extrude(amount=BOSS_EXTRUDE9_DEPTH, both=True)



with BuildPart() as body_3:
    # Sketch44 → Boss-Extrude9 2 (new, symmetric)
    with BuildSketch(Plane.XY.offset(-54)):
        Polygon((75, 54), (82, 54), (18.448264343, 0), (18.448264343, 7), align=None)
    extrude(amount=BOSS_EXTRUDE9_2_DEPTH, both=True)


with BuildPart() as body_2_1:
    add(body_2.part)

    add(body_3.part)  # Boss-Extrude11 merges body 3
    # Sketch47 → Boss-Extrude11 (add)
    with BuildSketch(Plane(origin=(0, 54, 0), x_dir=(1, 0, 0), z_dir=(0, 1, 0))):
        with BuildLine():
            Line((-75, 52.25), (-82, 52.25))
            ThreePointArc((-82, 52.25), (0, 135.599380125), (82, 52.25))
            Line((82, 52.25), (75, 52.25))
            ThreePointArc((75, 52.25), (0, 128.600399436), (-75, 52.25))
        make_face()
    extrude(amount=BOSS_EXTRUDE11_DEPTH)

    # Sketch45 → Boss-Extrude12 (add, symmetric)
    with BuildSketch(Plane(origin=(0, 0, 0), x_dir=(0, 1, 0), z_dir=(-1, 0, 0))):
        Polygon((0, 72.036721611), (54, 135.599380125), (54, 128.599380125), (7, 72.036721611), align=None)
    extrude(amount=BOSS_EXTRUDE12_DEPTH, both=True)


solid = Compound([part.part, body_2_1.part])
